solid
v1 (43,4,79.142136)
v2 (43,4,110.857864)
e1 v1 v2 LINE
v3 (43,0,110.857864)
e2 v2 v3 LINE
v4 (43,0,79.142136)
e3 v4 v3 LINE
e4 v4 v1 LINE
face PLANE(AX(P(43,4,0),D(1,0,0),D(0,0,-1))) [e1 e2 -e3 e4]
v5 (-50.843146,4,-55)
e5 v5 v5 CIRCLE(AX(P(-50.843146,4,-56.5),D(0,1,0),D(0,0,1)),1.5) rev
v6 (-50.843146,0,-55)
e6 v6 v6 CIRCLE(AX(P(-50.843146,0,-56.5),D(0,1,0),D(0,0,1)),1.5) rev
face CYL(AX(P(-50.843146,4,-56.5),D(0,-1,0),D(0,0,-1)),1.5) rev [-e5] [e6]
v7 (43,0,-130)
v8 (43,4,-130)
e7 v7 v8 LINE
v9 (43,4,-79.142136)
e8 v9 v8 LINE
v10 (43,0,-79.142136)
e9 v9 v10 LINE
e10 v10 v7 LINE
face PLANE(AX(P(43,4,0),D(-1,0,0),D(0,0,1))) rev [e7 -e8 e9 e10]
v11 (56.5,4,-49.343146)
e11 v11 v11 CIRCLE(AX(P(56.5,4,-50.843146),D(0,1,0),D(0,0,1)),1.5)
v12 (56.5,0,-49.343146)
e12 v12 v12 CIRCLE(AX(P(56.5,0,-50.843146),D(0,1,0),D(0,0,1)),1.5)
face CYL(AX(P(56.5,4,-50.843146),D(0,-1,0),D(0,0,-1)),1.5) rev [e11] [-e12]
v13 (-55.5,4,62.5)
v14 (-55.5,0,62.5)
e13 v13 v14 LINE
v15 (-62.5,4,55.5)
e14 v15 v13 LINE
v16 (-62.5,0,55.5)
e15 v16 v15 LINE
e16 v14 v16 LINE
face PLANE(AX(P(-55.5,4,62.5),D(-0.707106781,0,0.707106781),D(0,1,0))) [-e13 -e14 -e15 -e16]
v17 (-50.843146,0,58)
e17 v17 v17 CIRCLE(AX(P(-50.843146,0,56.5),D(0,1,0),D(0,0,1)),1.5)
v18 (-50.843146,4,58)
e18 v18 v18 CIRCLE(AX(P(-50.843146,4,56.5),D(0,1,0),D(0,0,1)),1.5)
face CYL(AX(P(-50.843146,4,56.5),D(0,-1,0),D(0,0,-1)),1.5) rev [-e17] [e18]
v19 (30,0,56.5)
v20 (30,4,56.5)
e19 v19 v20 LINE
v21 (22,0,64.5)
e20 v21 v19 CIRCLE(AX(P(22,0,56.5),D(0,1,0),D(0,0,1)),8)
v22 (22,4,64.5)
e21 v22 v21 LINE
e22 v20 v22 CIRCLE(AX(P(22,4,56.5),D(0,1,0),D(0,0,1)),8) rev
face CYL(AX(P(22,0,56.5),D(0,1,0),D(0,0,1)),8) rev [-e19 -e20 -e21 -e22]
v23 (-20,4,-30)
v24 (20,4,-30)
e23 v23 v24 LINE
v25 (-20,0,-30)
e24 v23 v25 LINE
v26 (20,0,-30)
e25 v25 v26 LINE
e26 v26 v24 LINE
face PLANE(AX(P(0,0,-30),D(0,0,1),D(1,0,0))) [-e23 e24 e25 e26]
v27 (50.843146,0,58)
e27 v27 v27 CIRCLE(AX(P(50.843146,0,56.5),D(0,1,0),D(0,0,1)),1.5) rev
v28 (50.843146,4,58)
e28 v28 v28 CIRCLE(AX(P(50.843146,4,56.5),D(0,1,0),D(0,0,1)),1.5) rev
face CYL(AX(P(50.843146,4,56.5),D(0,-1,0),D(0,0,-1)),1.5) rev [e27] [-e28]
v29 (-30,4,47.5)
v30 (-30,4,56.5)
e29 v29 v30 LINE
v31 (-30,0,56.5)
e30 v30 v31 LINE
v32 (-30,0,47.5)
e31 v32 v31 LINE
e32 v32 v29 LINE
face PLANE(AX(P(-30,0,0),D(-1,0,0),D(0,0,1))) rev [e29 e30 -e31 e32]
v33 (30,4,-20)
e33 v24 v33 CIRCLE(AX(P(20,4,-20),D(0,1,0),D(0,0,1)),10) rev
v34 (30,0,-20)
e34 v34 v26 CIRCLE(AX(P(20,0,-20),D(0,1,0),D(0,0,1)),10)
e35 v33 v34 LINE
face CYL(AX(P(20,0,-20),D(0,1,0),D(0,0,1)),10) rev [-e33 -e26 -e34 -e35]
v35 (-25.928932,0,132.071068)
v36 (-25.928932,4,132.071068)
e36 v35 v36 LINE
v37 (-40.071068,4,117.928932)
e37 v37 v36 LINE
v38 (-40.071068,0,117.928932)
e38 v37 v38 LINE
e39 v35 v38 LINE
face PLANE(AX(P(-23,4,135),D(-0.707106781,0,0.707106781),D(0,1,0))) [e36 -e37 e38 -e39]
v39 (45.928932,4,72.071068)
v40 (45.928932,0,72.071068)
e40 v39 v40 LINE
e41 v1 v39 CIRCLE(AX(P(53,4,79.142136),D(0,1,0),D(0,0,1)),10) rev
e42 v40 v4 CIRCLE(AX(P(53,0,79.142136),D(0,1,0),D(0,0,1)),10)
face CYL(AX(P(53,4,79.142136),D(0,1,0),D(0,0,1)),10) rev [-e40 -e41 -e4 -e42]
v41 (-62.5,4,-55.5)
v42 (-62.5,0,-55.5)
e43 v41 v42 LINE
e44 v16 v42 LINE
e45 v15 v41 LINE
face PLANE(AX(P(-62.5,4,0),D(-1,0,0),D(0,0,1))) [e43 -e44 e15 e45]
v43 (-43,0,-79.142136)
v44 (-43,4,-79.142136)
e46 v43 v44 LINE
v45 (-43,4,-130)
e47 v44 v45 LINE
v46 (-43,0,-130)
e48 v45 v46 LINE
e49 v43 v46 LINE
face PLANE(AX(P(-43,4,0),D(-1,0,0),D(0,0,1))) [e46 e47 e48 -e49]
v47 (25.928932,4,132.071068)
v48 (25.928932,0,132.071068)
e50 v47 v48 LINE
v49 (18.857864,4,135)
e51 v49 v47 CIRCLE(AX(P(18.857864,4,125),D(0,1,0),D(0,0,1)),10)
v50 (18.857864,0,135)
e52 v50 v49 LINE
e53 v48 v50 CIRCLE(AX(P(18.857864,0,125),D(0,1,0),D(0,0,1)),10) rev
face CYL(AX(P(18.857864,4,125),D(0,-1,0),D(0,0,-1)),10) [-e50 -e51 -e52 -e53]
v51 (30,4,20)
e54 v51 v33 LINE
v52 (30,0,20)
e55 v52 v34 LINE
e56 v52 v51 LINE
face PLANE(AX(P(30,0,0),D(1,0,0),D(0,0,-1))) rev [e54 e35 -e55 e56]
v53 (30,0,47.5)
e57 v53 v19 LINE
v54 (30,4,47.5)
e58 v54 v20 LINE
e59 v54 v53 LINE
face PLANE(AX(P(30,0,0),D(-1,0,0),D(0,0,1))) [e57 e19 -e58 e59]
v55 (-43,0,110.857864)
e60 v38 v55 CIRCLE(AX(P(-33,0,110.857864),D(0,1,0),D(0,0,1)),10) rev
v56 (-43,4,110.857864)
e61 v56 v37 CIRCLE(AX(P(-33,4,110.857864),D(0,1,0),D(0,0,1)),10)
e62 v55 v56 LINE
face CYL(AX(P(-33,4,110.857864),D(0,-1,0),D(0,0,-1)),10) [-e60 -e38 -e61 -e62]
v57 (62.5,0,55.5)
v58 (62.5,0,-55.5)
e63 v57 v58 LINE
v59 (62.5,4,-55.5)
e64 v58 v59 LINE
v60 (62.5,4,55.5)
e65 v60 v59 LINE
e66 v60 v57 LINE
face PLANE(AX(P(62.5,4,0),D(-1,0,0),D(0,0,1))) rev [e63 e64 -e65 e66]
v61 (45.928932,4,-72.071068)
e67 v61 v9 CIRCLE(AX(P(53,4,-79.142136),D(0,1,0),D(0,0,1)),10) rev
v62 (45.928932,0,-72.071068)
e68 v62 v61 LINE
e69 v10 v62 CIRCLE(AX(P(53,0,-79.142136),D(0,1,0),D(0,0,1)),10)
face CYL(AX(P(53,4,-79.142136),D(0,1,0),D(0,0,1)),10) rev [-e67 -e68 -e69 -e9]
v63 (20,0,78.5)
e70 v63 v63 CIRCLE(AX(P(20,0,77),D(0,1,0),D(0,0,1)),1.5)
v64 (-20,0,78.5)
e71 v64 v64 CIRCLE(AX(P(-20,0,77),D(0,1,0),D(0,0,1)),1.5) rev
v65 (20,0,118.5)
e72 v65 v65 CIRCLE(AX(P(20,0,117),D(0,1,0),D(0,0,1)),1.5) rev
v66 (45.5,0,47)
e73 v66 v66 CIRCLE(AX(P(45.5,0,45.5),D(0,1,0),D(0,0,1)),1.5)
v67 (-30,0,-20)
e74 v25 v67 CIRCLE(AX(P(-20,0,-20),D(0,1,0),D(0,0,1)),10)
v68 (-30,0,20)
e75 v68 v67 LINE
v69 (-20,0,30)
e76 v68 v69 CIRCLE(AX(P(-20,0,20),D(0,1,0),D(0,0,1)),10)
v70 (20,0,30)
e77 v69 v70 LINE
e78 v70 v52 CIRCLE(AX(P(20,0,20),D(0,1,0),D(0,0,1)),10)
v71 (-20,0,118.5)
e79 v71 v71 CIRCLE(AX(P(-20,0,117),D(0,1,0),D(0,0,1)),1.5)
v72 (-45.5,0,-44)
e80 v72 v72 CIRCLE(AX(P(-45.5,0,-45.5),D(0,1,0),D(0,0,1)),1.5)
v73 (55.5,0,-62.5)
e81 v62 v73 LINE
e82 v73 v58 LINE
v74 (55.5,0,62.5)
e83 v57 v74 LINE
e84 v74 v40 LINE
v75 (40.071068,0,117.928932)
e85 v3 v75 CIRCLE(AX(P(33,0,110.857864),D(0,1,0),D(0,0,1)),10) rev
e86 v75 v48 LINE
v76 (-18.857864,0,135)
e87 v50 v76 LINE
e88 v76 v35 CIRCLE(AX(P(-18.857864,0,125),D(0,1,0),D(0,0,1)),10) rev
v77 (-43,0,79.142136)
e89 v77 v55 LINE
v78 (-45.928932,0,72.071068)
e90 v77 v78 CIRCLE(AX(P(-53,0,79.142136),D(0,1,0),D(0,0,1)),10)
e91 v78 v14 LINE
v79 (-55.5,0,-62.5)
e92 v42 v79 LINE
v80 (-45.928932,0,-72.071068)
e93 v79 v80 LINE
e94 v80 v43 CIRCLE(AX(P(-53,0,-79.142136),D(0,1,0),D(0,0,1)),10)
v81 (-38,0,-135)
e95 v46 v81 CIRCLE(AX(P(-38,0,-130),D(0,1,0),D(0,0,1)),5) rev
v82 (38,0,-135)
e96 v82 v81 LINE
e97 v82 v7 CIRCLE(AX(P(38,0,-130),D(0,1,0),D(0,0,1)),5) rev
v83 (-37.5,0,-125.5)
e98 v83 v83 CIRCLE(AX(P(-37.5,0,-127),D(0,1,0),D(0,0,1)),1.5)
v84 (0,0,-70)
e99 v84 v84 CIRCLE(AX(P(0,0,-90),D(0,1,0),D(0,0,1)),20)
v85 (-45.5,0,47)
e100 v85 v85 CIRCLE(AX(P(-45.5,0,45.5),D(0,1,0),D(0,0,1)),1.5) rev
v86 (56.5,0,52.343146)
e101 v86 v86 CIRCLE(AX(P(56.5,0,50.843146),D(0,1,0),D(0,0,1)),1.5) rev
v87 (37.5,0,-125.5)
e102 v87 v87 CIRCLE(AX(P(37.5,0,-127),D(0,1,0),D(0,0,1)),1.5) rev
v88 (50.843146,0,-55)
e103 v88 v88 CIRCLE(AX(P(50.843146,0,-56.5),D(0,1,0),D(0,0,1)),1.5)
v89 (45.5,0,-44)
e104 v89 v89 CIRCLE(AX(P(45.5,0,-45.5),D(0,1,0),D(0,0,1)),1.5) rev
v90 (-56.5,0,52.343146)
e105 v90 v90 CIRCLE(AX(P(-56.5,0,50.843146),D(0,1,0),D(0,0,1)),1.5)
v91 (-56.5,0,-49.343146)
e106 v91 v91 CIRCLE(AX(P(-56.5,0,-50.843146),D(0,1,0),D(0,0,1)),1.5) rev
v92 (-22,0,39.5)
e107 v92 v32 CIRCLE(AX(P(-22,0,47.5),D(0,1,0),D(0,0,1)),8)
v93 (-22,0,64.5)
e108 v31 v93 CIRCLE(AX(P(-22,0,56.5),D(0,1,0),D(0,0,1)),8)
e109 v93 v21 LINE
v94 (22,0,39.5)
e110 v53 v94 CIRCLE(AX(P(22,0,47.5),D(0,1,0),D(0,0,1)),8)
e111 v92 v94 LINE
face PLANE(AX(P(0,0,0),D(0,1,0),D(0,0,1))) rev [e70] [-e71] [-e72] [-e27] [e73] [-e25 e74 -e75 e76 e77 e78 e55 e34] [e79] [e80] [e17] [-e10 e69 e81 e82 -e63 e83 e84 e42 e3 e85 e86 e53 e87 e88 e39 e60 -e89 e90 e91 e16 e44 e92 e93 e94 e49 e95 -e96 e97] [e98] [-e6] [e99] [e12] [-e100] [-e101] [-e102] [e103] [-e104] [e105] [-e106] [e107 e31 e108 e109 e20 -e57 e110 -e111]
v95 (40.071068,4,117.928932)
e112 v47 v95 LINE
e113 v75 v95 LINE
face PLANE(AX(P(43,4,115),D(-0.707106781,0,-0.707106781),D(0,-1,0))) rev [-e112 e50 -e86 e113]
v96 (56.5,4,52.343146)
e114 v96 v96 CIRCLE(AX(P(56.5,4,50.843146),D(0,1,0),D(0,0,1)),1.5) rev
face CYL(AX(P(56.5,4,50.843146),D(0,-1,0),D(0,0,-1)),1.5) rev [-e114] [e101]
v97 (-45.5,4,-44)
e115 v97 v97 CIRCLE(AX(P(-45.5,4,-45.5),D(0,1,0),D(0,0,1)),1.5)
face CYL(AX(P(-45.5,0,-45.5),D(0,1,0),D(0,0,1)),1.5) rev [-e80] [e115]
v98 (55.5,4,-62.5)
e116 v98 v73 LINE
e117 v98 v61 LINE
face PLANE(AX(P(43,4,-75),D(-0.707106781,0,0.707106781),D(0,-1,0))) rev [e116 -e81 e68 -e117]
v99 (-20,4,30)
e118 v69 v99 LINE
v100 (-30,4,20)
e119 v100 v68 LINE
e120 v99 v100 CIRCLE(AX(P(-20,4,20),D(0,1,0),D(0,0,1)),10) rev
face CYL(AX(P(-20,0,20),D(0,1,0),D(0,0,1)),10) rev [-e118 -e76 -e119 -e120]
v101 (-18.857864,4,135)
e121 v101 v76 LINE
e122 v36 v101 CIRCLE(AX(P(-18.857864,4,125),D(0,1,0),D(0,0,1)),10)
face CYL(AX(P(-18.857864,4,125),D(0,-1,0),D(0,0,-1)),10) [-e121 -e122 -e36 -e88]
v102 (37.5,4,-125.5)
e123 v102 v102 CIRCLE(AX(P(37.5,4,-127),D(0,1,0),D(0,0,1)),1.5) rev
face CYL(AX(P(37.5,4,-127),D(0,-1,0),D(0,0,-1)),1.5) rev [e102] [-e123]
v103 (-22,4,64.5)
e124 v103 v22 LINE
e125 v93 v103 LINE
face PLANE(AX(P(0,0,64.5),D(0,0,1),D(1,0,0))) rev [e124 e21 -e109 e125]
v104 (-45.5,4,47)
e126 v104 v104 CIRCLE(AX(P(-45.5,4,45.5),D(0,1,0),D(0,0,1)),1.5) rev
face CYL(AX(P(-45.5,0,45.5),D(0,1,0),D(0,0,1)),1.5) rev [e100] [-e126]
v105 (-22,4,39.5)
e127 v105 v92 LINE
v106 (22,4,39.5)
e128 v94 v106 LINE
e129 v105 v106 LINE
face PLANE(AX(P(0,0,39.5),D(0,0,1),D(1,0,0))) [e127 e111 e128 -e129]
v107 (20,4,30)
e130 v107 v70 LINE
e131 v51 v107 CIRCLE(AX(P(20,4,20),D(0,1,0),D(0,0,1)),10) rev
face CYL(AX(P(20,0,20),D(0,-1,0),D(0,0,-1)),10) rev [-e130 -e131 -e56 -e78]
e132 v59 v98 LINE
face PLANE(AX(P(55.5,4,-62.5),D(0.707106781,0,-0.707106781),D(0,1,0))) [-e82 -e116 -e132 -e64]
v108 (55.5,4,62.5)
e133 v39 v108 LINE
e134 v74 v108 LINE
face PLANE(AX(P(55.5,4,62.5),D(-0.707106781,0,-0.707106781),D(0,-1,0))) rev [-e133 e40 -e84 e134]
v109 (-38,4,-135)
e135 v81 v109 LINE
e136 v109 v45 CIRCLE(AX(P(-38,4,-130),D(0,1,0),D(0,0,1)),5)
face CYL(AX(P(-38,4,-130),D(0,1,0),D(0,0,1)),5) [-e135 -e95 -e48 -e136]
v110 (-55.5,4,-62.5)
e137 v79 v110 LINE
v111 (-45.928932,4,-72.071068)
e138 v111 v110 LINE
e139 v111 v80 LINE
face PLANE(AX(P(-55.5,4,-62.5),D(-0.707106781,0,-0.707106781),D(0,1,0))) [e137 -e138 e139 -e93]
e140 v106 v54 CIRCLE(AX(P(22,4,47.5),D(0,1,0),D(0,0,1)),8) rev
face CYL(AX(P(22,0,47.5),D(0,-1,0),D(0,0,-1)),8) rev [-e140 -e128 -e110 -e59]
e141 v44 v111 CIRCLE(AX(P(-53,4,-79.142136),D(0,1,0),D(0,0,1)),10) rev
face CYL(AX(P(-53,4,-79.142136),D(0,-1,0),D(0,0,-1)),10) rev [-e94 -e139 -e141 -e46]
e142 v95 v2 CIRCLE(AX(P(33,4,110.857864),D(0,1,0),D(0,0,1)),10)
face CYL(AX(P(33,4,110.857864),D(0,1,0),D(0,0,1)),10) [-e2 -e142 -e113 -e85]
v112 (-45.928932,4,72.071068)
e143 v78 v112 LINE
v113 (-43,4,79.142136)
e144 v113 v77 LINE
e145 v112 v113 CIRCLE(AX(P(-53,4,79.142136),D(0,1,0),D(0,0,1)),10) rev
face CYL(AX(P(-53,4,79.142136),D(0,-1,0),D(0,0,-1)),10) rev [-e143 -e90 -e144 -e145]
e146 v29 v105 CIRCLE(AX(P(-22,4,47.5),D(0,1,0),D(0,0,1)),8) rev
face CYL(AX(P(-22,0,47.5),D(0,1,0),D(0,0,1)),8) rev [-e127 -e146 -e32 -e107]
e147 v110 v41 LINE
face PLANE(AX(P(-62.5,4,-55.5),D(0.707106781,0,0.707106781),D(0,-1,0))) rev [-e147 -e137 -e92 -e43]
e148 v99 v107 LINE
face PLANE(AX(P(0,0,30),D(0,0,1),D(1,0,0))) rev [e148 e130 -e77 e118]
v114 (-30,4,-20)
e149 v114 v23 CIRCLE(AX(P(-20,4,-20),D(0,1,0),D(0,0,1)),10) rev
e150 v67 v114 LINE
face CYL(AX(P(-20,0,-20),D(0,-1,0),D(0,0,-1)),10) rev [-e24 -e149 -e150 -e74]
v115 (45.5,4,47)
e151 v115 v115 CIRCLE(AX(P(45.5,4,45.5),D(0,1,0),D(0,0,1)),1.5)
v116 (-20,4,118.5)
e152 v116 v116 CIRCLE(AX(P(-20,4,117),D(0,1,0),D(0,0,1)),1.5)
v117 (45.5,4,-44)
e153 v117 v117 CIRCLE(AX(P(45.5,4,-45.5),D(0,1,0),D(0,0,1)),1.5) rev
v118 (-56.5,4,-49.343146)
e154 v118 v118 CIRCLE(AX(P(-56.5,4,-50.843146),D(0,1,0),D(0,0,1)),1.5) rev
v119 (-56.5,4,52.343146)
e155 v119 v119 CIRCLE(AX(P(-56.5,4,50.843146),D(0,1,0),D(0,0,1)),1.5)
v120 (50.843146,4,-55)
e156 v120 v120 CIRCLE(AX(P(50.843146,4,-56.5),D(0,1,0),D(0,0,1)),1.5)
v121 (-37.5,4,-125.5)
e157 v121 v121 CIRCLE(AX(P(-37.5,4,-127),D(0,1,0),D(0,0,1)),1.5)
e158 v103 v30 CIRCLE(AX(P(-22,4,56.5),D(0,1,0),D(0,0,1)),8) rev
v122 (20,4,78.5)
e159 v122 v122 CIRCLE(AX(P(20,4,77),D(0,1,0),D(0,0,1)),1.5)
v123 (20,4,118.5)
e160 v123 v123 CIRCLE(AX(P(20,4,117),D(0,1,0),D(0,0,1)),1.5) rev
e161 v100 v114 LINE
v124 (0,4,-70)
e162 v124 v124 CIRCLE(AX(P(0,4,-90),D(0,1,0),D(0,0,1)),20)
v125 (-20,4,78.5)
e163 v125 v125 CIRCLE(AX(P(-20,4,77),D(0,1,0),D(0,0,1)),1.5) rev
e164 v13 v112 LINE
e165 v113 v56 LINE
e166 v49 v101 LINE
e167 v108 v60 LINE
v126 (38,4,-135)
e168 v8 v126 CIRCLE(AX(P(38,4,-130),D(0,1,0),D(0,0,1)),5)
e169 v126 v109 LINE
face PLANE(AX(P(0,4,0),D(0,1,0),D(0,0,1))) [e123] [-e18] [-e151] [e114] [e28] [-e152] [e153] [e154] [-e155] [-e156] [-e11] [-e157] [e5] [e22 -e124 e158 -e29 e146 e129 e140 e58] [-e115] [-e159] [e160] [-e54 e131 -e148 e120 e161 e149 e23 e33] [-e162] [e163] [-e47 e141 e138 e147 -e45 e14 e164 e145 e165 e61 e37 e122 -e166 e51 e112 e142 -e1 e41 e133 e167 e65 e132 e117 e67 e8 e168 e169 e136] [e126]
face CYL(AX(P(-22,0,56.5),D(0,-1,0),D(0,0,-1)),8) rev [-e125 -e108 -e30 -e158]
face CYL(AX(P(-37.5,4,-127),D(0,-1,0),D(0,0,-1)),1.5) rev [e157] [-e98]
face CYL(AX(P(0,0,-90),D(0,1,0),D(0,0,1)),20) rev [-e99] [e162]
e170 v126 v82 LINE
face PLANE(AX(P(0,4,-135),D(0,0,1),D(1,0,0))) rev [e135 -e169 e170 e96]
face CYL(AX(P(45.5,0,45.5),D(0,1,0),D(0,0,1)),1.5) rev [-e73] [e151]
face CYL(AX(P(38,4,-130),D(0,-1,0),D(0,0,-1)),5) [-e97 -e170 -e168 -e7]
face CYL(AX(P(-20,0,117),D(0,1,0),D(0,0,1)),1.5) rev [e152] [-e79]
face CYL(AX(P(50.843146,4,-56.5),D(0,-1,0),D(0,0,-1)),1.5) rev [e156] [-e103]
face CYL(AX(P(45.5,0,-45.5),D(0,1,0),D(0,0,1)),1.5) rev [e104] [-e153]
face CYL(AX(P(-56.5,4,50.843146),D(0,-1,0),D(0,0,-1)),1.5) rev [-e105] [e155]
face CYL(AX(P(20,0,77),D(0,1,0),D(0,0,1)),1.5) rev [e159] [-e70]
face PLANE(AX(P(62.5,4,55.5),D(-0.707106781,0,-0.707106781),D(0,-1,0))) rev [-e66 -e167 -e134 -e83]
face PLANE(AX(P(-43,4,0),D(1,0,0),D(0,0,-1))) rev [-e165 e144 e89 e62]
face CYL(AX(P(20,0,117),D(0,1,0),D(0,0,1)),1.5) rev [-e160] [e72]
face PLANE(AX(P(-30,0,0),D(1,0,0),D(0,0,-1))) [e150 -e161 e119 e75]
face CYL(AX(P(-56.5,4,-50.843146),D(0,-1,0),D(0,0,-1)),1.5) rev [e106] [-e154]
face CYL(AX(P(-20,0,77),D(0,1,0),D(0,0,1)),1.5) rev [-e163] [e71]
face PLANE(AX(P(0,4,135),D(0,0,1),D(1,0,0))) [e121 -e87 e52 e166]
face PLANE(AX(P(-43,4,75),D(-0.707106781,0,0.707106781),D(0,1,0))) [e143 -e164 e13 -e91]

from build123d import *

# Parameters (mm, degrees)
SKETCH_1_R          = 1.5
EXTRUDE_1_DEPTH     = 4
CHAMFER_1_SIZE      = 7
SKETCH_3_W          = 60
SKETCH_3_H          = 60
SKETCH_3_R          = 1.5
SKETCH_3_R_2        = 20
SKETCH_3_H_2        = 10
SKETCH_3_H_3        = 5
CUT_EXTRUDE_1_DEPTH = 4
FILLET_3_R          = 10
FILLET_4_R          = 5
FILLET_5_R          = 8
CHAMFER_2_SIZE      = 12.5
FILLET_6_R          = 10
CHAMFER_3_SIZE      = 20
FILLET_7_R          = 10


with BuildPart() as part:
    # 草图1 → 凸台-拉伸1 (new body)
    with BuildSketch(Plane(origin=(0, 0, 0), x_dir=(1, 0, 0), z_dir=(0, 1, 0))):
        Polygon((-62.5, 62.5), (-62.5, -62.5), (-43, -62.5), (-43, -135), (43, -135), (43, -62.5), (62.5, -62.5), (62.5, 62.5), (43, 62.5), (43, 135), (-43, 135), (-43, 62.5), align=None)
        with Locations(Location((-56.5, -50.843145751, 0), (0, 0, 270))):
            Circle(SKETCH_1_R, mode=Mode.SUBTRACT)
        with Locations(Location((-50.843145751, -56.5, 0), (0, 0, 270))):
            Circle(SKETCH_1_R, mode=Mode.SUBTRACT)
        with Locations(Location((50.843145751, -56.5, 0), (0, 0, 270))):
            Circle(SKETCH_1_R, mode=Mode.SUBTRACT)
        with Locations(Location((56.5, -50.843145751, 0), (0, 0, 270))):
            Circle(SKETCH_1_R, mode=Mode.SUBTRACT)
        with Locations(Location((-56.5, 50.843145751, 0), (0, 0, 270))):
            Circle(SKETCH_1_R, mode=Mode.SUBTRACT)
        with Locations(Location((-50.843145751, 56.5, 0), (0, 0, 270))):
            Circle(SKETCH_1_R, mode=Mode.SUBTRACT)
        with Locations(Location((50.843145751, 56.5, 0), (0, 0, 270))):
            Circle(SKETCH_1_R, mode=Mode.SUBTRACT)
        with Locations(Location((56.5, 50.843145751, 0), (0, 0, 270))):
            Circle(SKETCH_1_R, mode=Mode.SUBTRACT)
        with Locations(Location((37.5, 127, 0), (0, 0, 270))):
            Circle(SKETCH_1_R, mode=Mode.SUBTRACT)
        with Locations(Location((-37.5, 127, 0), (0, 0, 270))):
            Circle(SKETCH_1_R, mode=Mode.SUBTRACT)
    extrude(amount=EXTRUDE_1_DEPTH)

    # 倒角1
    chamfer_1_edges = [part.edges().sort_by_distance(p)[0] for p in [
        (-62.5, 2, 62.5),
        (-62.5, 2, -62.5),
        (62.5, 2, -62.5),
        (62.5, 2, 62.5),
    ]]
    chamfer(chamfer_1_edges, length=CHAMFER_1_SIZE)

    # 草图3 → 切除-拉伸1 (cut)
    with BuildSketch(Plane(origin=(0, 4, 0), x_dir=(1, 0, 0), z_dir=(0, 1, 0))):
        Rectangle(SKETCH_3_W, SKETCH_3_H)
        with Locations(Location((-45.5, 45.5, 0), (0, 0, 270))):
            Circle(SKETCH_3_R)
        with Locations(Location((45.5, 45.5, 0), (0, 0, 270))):
            Circle(SKETCH_3_R)
        with Locations(Location((45.5, -45.5, 0), (0, 0, 270))):
            Circle(SKETCH_3_R)
        with Locations(Location((-45.5, -45.5, 0), (0, 0, 270))):
            Circle(SKETCH_3_R)
        with Locations(Location((0, 90, 0), (0, 0, 270))):
            Circle(SKETCH_3_R_2)
        with Locations((0, -44.5)):
            Rectangle(SKETCH_3_W, SKETCH_3_H_2)
        with Locations((0, -54.5)):
            Rectangle(SKETCH_3_W, SKETCH_3_H_2)
        with Locations((0, -62)):
            Rectangle(SKETCH_3_W, SKETCH_3_H_3)
        with Locations(Location((-20, -77, 0), (0, 0, 270))):
            Circle(SKETCH_3_R)
        with Locations(Location((20, -77, 0), (0, 0, 270))):
            Circle(SKETCH_3_R)
        with Locations(Location((20, -117, 0), (0, 0, 270))):
            Circle(SKETCH_3_R)
        with Locations(Location((-20, -117, 0), (0, 0, 270))):
            Circle(SKETCH_3_R)
    extrude(amount=-CUT_EXTRUDE_1_DEPTH, mode=Mode.SUBTRACT)

    # 圆角3
    fillet_3_edges = [part.edges().sort_by_distance(p)[0] for p in [
        (30, 2, 30),
        (-30, 2, 30),
        (-30, 2, -30),
        (30, 2, -30),
    ]]
    fillet(fillet_3_edges, radius=FILLET_3_R)

    # 圆角4
    fillet_4_edges = [part.edges().sort_by_distance(p)[0] for p in [
        (-43, 2, -135),
        (43, 2, -135),
    ]]
    fillet(fillet_4_edges, radius=FILLET_4_R)

    # 圆角5
    fillet_5_edges = [part.edges().sort_by_distance(p)[0] for p in [
        (30, 2, 39.5),
        (30, 2, 64.5),
        (-30, 2, 64.5),
        (-30, 2, 39.5),
    ]]
    fillet(fillet_5_edges, radius=FILLET_5_R)

    # 倒角2
    chamfer_2_edges = [part.edges().sort_by_distance(p)[0] for p in [
        (43, 2, -62.5),
        (-43, 2, -62.5),
        (43, 2, 62.5),
        (-43, 2, 62.5),
    ]]
    chamfer(chamfer_2_edges, length=CHAMFER_2_SIZE - 0.0001)  # a hair under: the kernel refuses the full size

    # 圆角6
    fillet_6_edges = [part.edges().sort_by_distance(p)[0] for p in [
        (43, 2, -74.9999),
        (-43, 2, -74.9999),
        (43, 2, 74.9999),
        (-43, 2, 74.9999),
    ]]
    fillet(fillet_6_edges, radius=FILLET_6_R)

    # 倒角3
    chamfer_3_edges = [part.edges().sort_by_distance(p)[0] for p in [
        (43, 2, 135),
        (-43, 2, 135),
    ]]
    chamfer(chamfer_3_edges, length=CHAMFER_3_SIZE)

    # 圆角7
    fillet_7_edges = [part.edges().sort_by_distance(p)[0] for p in [
        (43, 2, 115),
        (-23, 2, 135),
        (23, 2, 135),
        (-43, 2, 115),
    ]]
    fillet(fillet_7_edges, radius=FILLET_7_R)


solid = part.part
